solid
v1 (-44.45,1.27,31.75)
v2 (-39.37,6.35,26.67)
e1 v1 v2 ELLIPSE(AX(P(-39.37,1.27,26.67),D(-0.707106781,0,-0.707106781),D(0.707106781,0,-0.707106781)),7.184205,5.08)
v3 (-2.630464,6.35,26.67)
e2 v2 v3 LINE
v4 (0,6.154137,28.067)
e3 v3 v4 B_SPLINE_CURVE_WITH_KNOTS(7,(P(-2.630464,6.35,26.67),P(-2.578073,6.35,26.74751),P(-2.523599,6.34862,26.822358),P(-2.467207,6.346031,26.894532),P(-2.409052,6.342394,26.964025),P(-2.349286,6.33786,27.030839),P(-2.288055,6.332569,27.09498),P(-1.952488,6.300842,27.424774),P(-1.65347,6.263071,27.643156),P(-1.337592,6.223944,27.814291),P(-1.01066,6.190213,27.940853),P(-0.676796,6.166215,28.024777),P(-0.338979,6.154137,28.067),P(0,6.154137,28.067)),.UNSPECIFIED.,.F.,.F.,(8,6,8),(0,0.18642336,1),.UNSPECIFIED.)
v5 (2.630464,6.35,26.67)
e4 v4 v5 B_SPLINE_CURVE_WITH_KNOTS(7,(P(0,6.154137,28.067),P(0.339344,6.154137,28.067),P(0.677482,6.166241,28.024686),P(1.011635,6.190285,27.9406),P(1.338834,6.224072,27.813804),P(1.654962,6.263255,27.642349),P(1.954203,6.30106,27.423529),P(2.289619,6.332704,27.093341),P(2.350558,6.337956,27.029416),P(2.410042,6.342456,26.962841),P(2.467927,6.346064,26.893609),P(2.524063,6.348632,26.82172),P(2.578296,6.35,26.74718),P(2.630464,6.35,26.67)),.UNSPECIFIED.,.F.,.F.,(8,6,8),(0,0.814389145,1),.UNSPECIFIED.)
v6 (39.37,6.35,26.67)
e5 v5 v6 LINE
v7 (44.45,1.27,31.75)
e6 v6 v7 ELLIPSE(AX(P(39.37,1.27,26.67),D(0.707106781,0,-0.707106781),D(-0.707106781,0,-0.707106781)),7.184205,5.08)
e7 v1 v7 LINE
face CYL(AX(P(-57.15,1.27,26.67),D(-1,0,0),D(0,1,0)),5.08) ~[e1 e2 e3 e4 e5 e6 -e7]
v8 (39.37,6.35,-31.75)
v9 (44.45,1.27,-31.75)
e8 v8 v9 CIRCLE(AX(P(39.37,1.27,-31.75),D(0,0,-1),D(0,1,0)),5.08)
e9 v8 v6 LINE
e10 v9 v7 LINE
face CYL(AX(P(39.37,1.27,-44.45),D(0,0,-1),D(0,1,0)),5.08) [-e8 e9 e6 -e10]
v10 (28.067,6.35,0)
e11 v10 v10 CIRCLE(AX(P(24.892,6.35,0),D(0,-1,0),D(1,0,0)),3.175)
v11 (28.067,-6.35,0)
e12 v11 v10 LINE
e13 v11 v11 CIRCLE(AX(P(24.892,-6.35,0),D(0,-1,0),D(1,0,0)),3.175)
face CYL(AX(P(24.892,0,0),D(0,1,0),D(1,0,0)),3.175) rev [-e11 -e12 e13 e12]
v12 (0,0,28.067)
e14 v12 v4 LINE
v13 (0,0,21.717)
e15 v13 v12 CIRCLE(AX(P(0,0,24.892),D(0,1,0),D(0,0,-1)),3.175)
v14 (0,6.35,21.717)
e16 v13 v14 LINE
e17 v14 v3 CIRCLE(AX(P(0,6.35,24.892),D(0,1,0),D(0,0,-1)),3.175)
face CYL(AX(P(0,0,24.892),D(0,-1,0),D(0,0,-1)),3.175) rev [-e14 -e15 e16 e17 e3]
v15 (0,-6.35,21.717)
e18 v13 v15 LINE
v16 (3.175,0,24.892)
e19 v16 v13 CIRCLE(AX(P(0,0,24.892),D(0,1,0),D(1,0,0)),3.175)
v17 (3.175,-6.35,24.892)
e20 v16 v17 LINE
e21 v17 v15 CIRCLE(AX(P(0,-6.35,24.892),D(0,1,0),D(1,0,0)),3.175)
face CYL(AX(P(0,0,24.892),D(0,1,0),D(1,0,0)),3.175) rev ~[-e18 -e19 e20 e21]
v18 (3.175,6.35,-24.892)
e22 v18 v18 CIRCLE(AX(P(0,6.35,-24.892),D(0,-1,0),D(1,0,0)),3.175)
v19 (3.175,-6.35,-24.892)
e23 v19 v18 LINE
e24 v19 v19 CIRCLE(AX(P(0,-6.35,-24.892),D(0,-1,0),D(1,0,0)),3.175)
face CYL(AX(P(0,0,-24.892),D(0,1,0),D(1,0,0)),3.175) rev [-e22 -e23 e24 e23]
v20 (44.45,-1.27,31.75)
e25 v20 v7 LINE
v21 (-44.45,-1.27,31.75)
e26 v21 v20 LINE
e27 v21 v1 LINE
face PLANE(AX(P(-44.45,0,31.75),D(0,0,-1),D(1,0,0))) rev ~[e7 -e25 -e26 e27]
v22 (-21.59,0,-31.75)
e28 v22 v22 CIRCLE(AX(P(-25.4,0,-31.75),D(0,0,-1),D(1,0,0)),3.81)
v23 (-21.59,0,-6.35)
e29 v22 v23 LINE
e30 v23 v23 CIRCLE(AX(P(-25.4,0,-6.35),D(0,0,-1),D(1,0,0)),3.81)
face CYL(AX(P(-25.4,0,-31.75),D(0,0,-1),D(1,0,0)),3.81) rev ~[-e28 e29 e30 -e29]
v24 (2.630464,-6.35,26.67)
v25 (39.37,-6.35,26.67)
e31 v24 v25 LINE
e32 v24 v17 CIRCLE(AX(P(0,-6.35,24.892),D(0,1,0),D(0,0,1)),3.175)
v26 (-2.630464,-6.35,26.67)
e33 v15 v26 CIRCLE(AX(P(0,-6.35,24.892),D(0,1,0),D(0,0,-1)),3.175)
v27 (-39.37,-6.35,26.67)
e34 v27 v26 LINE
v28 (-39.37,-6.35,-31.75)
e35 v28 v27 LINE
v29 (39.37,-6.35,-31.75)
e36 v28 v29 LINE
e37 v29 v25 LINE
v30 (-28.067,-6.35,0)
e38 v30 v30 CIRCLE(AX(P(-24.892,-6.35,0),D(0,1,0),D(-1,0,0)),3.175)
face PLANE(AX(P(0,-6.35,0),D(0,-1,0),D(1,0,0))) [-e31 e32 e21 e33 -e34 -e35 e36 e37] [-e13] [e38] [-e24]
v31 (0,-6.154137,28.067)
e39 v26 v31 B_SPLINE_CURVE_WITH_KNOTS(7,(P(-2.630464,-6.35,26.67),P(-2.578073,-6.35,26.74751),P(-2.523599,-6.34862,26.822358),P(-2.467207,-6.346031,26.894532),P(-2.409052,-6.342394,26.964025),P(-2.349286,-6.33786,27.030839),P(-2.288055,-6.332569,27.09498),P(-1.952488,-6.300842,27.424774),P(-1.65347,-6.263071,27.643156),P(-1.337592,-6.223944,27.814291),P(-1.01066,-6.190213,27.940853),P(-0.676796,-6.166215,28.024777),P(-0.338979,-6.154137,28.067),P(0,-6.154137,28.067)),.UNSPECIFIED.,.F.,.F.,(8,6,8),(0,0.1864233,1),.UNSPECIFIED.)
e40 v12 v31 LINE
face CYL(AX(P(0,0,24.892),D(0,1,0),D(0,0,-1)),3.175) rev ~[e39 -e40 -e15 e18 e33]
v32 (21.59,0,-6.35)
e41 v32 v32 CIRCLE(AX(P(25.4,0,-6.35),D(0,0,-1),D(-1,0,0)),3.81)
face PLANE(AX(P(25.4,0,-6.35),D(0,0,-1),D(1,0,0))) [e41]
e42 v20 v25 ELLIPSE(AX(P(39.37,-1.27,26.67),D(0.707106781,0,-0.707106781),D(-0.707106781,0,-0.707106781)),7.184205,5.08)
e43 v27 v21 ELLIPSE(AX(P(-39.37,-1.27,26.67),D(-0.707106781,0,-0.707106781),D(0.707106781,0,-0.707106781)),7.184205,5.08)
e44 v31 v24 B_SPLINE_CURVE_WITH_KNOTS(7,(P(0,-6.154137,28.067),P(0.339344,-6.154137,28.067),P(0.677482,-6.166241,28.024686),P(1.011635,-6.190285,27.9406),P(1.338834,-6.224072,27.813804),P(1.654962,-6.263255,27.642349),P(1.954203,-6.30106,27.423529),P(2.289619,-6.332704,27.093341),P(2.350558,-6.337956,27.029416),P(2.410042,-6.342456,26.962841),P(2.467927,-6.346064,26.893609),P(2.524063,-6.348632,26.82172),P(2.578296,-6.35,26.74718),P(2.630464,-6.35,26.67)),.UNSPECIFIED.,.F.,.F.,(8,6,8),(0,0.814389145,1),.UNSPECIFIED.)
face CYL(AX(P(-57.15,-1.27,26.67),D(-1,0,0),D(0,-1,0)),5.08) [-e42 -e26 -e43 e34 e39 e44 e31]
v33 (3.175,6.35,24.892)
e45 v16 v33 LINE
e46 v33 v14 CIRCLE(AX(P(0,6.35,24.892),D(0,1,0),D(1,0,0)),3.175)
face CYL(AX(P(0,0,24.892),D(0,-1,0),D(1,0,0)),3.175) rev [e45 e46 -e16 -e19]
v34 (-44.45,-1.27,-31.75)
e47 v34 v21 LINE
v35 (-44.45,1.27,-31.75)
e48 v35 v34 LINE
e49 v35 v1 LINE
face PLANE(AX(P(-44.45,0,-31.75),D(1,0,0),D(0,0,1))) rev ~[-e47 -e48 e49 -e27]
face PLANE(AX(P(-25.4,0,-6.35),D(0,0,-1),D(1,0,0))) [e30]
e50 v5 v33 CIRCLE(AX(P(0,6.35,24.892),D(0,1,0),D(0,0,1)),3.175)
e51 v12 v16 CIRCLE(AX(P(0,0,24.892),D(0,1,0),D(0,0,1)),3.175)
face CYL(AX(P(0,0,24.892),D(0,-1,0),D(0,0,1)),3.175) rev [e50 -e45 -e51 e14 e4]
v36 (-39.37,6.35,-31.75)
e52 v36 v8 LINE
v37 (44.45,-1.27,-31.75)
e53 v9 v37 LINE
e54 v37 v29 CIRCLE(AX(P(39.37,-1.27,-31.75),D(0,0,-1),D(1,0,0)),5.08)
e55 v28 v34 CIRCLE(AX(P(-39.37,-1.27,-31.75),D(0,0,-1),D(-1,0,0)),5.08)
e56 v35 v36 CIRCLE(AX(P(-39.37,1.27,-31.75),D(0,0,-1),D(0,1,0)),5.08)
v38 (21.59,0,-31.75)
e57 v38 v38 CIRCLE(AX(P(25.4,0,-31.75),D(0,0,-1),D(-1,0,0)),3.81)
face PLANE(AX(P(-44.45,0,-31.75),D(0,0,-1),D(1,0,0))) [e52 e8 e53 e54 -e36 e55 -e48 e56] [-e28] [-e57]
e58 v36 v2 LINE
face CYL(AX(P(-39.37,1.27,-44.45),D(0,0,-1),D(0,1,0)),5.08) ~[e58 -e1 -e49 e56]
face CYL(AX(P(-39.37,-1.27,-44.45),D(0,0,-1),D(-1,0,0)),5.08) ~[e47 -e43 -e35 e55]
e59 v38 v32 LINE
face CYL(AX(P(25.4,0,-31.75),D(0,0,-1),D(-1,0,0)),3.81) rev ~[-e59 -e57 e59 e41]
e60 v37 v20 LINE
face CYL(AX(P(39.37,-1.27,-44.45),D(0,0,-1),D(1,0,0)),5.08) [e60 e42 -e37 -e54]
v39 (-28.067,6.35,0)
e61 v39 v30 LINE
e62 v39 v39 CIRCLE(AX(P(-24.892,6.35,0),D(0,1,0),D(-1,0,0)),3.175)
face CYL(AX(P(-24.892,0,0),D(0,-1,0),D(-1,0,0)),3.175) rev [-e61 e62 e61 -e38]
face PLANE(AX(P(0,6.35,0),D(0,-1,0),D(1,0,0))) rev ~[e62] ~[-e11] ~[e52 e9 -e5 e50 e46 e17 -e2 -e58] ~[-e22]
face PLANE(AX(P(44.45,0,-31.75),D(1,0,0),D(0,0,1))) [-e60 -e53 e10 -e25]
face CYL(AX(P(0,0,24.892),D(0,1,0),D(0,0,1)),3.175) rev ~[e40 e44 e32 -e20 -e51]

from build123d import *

# Parameters (mm, degrees)
F0_W        = 88.9
F0_H        = 63.5
F0_R        = 3.175
F1_DEPTH    = 6.35
F2_R        = 3.81
F3_DEPTH    = 25.4
F4_T1_DEPTH = 88.9
F4_T3_DEPTH = 114.3


# Not quite as in the source:
# - a fillet or chamfer that OpenCascade refuses, or shapes differently, is made with other operations: its cross-section is extruded or revolved along the edge and cut away or added


with BuildPart() as f1:
    # F0 (on Front) → F1 (new body, symmetric)
    with BuildSketch(Plane.XZ):
        Rectangle(F0_W, F0_H)
        with Locations((0, -24.892)):
            Circle(F0_R, mode=Mode.SUBTRACT)
        with BuildLine():
            ThreePointArc((-21.717, 0), (-24.892, -3.175), (-28.067, 0))
            ThreePointArc((-28.067, 0), (-24.892, 3.175), (-21.717, 0))
        make_face(mode=Mode.SUBTRACT)
        with Locations((24.892, 0)):
            Circle(F0_R, mode=Mode.SUBTRACT)
        with BuildLine():
            ThreePointArc((0, 21.717), (-3.175, 24.892), (0, 28.067))
            ThreePointArc((0, 28.067), (2.2450640303, 27.1370640303), (3.175, 24.892))
            ThreePointArc((3.175, 24.892), (2.2450640303, 22.6469359697), (0, 21.717))
        make_face(mode=Mode.SUBTRACT)
    extrude(amount=F1_DEPTH, both=True)

    # F2 (on face) → F3 (cut)
    with BuildSketch(Plane(origin=(0, 0, -31.75), x_dir=(1, 0, 0), z_dir=(0, 0, -1))):
        with Locations((-25.4, 0)):
            Circle(F2_R)
        with BuildLine():
            ThreePointArc((29.21, 0), (25.4, 3.81), (21.59, 0))
            ThreePointArc((21.59, 0), (25.4, -3.81), (29.21, 0))
        make_face()
    extrude(amount=-F3_DEPTH, mode=Mode.SUBTRACT)

    # F4: fillet of radius 5.08 on 6 edges, made by hand

    # F4_s2 → F4_t1 (cut)
    with BuildSketch(Plane.XY.offset(-44.45)):
        with BuildLine():
            ThreePointArc((-44.45, -1.27), (-42.9621024484, -4.8621024484), (-39.37, -6.35))
            Line((-39.37, -6.35), (-44.45, -6.35))
            Line((-44.45, -6.35), (-44.45, -1.27))
        make_face()
        with BuildLine():
            ThreePointArc((44.45, -1.27), (42.9621024484, -4.8621024484), (39.37, -6.35))
            Line((39.37, -6.35), (44.45, -6.35))
            Line((44.45, -6.35), (44.45, -1.27))
        make_face()
        with BuildLine():
            ThreePointArc((39.37, 6.35), (42.9621024484, 4.8621024484), (44.45, 1.27))
            Line((44.45, 1.27), (44.45, 6.35))
            Line((44.45, 6.35), (39.37, 6.35))
        make_face()
        with BuildLine():
            ThreePointArc((-39.37, 6.35), (-42.9621024484, 4.8621024484), (-44.45, 1.27))
            Line((-44.45, 1.27), (-44.45, 6.35))
            Line((-44.45, 6.35), (-39.37, 6.35))
        make_face()
    extrude(amount=F4_T1_DEPTH, mode=Mode.SUBTRACT)

    # F4_s4 → F4_t3 (cut)
    with BuildSketch(Plane.YZ.offset(-57.15)):
        with BuildLine():
            ThreePointArc((-6.35, 26.67), (-4.8621024484, 30.2621024484), (-1.27, 31.75))
            Line((-1.27, 31.75), (-6.35, 31.75))
            Line((-6.35, 31.75), (-6.35, 26.67))
        make_face()
        with BuildLine():
            ThreePointArc((6.35, 26.67), (4.8621024484, 30.2621024484), (1.27, 31.75))
            Line((1.27, 31.75), (6.35, 31.75))
            Line((6.35, 31.75), (6.35, 26.67))
        make_face()
    extrude(amount=F4_T3_DEPTH, mode=Mode.SUBTRACT)


solid = f1.part
